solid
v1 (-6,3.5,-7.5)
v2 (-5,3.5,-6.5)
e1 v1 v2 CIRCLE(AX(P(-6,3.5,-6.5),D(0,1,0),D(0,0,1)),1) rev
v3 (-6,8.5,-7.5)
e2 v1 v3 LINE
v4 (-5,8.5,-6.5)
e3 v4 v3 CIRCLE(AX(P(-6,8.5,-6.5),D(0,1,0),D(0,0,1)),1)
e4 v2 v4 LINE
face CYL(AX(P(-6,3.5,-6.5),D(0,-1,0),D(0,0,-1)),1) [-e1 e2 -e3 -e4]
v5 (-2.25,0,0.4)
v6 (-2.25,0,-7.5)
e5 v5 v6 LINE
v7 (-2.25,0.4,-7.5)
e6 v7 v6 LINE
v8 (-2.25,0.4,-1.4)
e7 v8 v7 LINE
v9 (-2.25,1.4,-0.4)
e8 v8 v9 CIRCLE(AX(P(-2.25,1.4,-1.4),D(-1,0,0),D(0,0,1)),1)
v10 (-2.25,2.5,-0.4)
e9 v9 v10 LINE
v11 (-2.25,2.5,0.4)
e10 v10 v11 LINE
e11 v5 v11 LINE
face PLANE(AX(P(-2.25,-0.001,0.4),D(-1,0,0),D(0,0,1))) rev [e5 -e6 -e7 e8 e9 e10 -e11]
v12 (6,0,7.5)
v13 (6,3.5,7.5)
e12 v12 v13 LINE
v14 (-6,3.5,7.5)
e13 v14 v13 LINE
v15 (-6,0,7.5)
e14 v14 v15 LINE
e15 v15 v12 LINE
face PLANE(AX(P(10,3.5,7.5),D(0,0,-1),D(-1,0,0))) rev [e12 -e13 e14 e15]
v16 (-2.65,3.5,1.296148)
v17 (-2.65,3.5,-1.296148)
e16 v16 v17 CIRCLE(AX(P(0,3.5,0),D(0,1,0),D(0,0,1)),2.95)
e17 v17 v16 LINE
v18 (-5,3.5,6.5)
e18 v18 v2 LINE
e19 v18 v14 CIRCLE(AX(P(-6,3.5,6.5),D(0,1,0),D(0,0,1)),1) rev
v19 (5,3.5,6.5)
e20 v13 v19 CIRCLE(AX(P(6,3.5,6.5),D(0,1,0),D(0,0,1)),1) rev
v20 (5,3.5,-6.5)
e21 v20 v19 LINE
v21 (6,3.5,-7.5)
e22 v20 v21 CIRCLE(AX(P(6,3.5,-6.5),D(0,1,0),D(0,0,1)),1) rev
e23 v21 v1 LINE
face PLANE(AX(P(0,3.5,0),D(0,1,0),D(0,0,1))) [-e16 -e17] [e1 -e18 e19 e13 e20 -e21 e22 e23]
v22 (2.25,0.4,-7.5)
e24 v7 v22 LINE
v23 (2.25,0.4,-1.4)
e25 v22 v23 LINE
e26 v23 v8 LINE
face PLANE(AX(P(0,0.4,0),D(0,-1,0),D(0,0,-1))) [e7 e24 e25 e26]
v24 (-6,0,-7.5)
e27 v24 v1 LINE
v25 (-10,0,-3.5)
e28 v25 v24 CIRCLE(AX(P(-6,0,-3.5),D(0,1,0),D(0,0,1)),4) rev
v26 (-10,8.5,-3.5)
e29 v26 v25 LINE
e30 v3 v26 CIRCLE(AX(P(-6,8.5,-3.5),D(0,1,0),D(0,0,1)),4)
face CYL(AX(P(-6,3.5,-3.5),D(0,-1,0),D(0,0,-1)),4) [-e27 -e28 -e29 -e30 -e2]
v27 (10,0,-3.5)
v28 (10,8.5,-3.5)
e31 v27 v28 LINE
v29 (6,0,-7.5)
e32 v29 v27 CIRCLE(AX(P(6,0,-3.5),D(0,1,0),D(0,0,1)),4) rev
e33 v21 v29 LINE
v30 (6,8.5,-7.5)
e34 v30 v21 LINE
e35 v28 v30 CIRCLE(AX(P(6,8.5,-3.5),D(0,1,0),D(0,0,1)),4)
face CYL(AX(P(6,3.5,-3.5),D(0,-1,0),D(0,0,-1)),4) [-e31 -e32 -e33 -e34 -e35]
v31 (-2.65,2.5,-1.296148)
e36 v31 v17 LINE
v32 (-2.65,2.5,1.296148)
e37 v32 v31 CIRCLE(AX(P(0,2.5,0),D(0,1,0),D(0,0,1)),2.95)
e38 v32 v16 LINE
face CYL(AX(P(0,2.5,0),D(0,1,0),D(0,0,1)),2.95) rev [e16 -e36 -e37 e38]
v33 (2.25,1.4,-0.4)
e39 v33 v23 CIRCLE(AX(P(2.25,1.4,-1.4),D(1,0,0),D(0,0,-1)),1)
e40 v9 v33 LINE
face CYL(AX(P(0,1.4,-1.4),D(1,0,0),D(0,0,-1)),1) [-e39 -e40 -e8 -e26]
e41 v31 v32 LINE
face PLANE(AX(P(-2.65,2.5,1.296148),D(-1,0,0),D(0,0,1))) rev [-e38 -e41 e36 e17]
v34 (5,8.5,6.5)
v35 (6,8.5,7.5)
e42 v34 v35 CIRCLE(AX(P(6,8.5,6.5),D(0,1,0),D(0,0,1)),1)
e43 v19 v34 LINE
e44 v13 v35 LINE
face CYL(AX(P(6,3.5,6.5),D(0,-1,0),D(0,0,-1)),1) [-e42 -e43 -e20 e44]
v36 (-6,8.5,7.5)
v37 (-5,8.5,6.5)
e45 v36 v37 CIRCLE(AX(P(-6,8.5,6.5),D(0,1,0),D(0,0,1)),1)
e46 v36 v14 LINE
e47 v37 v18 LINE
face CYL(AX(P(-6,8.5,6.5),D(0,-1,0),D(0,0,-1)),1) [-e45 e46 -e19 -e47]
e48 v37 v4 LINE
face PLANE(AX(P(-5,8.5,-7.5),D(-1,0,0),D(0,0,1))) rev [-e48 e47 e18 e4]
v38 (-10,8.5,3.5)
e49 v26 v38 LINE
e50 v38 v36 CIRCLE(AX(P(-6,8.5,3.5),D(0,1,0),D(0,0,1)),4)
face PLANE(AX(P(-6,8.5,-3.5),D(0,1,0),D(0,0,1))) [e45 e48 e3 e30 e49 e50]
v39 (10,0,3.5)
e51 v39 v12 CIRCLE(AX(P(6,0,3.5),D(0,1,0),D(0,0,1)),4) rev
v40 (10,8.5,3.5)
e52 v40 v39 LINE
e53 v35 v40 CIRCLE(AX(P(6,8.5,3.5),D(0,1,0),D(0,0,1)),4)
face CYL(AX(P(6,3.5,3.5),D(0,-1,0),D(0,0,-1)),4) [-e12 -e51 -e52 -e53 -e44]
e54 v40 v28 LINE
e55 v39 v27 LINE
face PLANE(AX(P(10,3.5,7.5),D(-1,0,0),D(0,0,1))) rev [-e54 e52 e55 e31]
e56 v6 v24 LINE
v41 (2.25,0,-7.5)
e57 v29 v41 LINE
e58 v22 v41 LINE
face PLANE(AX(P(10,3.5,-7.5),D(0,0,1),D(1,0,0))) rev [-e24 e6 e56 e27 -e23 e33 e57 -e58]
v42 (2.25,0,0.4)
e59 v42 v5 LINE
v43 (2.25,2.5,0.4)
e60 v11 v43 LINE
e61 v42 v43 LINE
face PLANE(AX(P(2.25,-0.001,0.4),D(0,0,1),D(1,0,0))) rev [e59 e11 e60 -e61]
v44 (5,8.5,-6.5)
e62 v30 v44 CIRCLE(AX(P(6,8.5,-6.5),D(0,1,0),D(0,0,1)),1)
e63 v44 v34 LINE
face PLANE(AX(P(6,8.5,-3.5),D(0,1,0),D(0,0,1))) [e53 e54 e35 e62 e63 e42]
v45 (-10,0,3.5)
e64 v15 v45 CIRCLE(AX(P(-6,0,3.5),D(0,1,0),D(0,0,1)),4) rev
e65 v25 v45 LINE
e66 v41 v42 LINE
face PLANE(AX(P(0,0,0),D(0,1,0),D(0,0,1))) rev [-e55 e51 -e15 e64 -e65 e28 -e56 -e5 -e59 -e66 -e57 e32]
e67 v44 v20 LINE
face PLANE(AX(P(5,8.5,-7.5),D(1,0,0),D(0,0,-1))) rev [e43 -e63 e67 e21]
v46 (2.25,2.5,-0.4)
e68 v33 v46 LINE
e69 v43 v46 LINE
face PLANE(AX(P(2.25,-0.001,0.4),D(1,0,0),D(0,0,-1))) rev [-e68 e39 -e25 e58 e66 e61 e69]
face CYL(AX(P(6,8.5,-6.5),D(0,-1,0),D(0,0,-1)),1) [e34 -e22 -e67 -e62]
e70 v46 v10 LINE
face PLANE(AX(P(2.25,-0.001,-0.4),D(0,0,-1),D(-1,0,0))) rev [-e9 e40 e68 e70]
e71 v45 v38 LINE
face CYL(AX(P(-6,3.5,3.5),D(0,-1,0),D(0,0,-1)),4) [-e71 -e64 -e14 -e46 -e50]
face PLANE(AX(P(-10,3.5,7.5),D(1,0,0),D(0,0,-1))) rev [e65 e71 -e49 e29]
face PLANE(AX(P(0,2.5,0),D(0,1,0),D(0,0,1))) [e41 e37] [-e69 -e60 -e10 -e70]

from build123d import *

# Parameters (mm, degrees)
SKETCH1_W           = 20
SKETCH1_H           = 15
BOSS_EXTRUDE1_DEPTH = 3.5
CUT_EXTRUDE1_DEPTH  = 1
CUT_EXTRUDE2_REACH  = 14.748
SKETCH3_W           = 4.5
SKETCH3_H           = 0.8
FILLET1_R           = 4
SKETCH4_W           = 4.5
SKETCH4_H           = 7.1
CUT_EXTRUDE3_DEPTH  = 0.4
FILLET2_R           = 1
BOSS_EXTRUDE2_START = 5
BOSS_EXTRUDE2_DEPTH = 5
FILLET3_R           = 1


with BuildPart() as part:
    # Sketch1 → Boss-Extrude1 (new body)
    with BuildSketch(Plane(origin=(0, 0, 0), x_dir=(1, 0, 0), z_dir=(0, 1, 0))):
        Rectangle(SKETCH1_W, SKETCH1_H)
    extrude(amount=BOSS_EXTRUDE1_DEPTH)

    # Sketch2 → Cut-Extrude1 (cut)
    with BuildSketch(Plane(origin=(0, 3.5, 0), x_dir=(1, 0, 0), z_dir=(0, 1, 0))):
        with BuildLine():
            Line((-2.65, -1.29614814), (-2.65, 1.29614814))
            ThreePointArc((-2.65, 1.29614814), (2.95, 0), (-2.65, -1.29614814))
        make_face()
    extrude(amount=-CUT_EXTRUDE1_DEPTH, mode=Mode.SUBTRACT)

    # Sketch3 → Cut-Extrude2 (cut, up to next)
    with BuildSketch(Plane(origin=(0, 2.5, 0), x_dir=(1, 0, 0), z_dir=(0, 1, 0)), mode=Mode.PRIVATE) as cut_extrude2_sk1:
        Rectangle(SKETCH3_W, SKETCH3_H)
    cut_extrude2_tool1 = extrude(cut_extrude2_sk1.sketch, amount=-CUT_EXTRUDE2_REACH, mode=Mode.PRIVATE) & part.part
    add(cut_extrude2_tool1.solids().sort_by_distance((0, 2.5, 0))[0], mode=Mode.SUBTRACT)

    # Fillet1
    fillet1_edges = [part.edges().sort_by_distance(p)[0] for p in [
        (-10, 1.75, -7.5),
        (10, 1.75, -7.5),
        (10, 1.75, 7.5),
        (-10, 1.75, 7.5),
    ]]
    fillet(fillet1_edges, radius=FILLET1_R)

    # Sketch4 → Cut-Extrude3 (cut)
    with BuildSketch(Plane.XZ):
        with Locations((0, -3.95)):
            Rectangle(SKETCH4_W, SKETCH4_H)
    extrude(amount=-CUT_EXTRUDE3_DEPTH, mode=Mode.SUBTRACT)

    # Fillet2
    fillet2_edges = [part.edges().sort_by_distance(p)[0] for p in [
        (0, 0.4, -0.4),
    ]]
    fillet(fillet2_edges, radius=FILLET2_R)

    # Sketch5 → Boss-Extrude2 (add)
    with BuildSketch(Plane(origin=(0, 3.5, 0), x_dir=(1, 0, 0), z_dir=(0, 1, 0)).offset(BOSS_EXTRUDE2_START)):
        with BuildLine():
            Line((-5, 7.5), (-5, -7.5))
            Line((-5, -7.5), (-6, -7.5))
            ThreePointArc((-6, -7.5), (-8.828427125, -6.328427125), (-10, -3.5))
            Line((-10, -3.5), (-10, 3.5))
            ThreePointArc((-10, 3.5), (-8.828427125, 6.328427125), (-6, 7.5))
            Line((-6, 7.5), (-5, 7.5))
        make_face()
        with BuildLine():
            Line((5, 7.5), (5, -7.5))
            Line((5, -7.5), (6, -7.5))
            ThreePointArc((6, -7.5), (8.828427125, -6.328427125), (10, -3.5))
            Line((10, -3.5), (10, 3.5))
            ThreePointArc((10, 3.5), (8.828427125, 6.328427125), (6, 7.5))
            Line((6, 7.5), (5, 7.5))
        make_face()
    extrude(amount=-BOSS_EXTRUDE2_DEPTH)

    # Fillet3
    fillet3_edges = [part.edges().sort_by_distance(p)[0] for p in [
        (5, 6, -7.5),
        (5, 6, 7.5),
        (-5, 6, -7.5),
        (-5, 6, 7.5),
    ]]
    fillet(fillet3_edges, radius=FILLET3_R - 0.0001)  # a hair under: the kernel refuses the full size


solid = part.part
